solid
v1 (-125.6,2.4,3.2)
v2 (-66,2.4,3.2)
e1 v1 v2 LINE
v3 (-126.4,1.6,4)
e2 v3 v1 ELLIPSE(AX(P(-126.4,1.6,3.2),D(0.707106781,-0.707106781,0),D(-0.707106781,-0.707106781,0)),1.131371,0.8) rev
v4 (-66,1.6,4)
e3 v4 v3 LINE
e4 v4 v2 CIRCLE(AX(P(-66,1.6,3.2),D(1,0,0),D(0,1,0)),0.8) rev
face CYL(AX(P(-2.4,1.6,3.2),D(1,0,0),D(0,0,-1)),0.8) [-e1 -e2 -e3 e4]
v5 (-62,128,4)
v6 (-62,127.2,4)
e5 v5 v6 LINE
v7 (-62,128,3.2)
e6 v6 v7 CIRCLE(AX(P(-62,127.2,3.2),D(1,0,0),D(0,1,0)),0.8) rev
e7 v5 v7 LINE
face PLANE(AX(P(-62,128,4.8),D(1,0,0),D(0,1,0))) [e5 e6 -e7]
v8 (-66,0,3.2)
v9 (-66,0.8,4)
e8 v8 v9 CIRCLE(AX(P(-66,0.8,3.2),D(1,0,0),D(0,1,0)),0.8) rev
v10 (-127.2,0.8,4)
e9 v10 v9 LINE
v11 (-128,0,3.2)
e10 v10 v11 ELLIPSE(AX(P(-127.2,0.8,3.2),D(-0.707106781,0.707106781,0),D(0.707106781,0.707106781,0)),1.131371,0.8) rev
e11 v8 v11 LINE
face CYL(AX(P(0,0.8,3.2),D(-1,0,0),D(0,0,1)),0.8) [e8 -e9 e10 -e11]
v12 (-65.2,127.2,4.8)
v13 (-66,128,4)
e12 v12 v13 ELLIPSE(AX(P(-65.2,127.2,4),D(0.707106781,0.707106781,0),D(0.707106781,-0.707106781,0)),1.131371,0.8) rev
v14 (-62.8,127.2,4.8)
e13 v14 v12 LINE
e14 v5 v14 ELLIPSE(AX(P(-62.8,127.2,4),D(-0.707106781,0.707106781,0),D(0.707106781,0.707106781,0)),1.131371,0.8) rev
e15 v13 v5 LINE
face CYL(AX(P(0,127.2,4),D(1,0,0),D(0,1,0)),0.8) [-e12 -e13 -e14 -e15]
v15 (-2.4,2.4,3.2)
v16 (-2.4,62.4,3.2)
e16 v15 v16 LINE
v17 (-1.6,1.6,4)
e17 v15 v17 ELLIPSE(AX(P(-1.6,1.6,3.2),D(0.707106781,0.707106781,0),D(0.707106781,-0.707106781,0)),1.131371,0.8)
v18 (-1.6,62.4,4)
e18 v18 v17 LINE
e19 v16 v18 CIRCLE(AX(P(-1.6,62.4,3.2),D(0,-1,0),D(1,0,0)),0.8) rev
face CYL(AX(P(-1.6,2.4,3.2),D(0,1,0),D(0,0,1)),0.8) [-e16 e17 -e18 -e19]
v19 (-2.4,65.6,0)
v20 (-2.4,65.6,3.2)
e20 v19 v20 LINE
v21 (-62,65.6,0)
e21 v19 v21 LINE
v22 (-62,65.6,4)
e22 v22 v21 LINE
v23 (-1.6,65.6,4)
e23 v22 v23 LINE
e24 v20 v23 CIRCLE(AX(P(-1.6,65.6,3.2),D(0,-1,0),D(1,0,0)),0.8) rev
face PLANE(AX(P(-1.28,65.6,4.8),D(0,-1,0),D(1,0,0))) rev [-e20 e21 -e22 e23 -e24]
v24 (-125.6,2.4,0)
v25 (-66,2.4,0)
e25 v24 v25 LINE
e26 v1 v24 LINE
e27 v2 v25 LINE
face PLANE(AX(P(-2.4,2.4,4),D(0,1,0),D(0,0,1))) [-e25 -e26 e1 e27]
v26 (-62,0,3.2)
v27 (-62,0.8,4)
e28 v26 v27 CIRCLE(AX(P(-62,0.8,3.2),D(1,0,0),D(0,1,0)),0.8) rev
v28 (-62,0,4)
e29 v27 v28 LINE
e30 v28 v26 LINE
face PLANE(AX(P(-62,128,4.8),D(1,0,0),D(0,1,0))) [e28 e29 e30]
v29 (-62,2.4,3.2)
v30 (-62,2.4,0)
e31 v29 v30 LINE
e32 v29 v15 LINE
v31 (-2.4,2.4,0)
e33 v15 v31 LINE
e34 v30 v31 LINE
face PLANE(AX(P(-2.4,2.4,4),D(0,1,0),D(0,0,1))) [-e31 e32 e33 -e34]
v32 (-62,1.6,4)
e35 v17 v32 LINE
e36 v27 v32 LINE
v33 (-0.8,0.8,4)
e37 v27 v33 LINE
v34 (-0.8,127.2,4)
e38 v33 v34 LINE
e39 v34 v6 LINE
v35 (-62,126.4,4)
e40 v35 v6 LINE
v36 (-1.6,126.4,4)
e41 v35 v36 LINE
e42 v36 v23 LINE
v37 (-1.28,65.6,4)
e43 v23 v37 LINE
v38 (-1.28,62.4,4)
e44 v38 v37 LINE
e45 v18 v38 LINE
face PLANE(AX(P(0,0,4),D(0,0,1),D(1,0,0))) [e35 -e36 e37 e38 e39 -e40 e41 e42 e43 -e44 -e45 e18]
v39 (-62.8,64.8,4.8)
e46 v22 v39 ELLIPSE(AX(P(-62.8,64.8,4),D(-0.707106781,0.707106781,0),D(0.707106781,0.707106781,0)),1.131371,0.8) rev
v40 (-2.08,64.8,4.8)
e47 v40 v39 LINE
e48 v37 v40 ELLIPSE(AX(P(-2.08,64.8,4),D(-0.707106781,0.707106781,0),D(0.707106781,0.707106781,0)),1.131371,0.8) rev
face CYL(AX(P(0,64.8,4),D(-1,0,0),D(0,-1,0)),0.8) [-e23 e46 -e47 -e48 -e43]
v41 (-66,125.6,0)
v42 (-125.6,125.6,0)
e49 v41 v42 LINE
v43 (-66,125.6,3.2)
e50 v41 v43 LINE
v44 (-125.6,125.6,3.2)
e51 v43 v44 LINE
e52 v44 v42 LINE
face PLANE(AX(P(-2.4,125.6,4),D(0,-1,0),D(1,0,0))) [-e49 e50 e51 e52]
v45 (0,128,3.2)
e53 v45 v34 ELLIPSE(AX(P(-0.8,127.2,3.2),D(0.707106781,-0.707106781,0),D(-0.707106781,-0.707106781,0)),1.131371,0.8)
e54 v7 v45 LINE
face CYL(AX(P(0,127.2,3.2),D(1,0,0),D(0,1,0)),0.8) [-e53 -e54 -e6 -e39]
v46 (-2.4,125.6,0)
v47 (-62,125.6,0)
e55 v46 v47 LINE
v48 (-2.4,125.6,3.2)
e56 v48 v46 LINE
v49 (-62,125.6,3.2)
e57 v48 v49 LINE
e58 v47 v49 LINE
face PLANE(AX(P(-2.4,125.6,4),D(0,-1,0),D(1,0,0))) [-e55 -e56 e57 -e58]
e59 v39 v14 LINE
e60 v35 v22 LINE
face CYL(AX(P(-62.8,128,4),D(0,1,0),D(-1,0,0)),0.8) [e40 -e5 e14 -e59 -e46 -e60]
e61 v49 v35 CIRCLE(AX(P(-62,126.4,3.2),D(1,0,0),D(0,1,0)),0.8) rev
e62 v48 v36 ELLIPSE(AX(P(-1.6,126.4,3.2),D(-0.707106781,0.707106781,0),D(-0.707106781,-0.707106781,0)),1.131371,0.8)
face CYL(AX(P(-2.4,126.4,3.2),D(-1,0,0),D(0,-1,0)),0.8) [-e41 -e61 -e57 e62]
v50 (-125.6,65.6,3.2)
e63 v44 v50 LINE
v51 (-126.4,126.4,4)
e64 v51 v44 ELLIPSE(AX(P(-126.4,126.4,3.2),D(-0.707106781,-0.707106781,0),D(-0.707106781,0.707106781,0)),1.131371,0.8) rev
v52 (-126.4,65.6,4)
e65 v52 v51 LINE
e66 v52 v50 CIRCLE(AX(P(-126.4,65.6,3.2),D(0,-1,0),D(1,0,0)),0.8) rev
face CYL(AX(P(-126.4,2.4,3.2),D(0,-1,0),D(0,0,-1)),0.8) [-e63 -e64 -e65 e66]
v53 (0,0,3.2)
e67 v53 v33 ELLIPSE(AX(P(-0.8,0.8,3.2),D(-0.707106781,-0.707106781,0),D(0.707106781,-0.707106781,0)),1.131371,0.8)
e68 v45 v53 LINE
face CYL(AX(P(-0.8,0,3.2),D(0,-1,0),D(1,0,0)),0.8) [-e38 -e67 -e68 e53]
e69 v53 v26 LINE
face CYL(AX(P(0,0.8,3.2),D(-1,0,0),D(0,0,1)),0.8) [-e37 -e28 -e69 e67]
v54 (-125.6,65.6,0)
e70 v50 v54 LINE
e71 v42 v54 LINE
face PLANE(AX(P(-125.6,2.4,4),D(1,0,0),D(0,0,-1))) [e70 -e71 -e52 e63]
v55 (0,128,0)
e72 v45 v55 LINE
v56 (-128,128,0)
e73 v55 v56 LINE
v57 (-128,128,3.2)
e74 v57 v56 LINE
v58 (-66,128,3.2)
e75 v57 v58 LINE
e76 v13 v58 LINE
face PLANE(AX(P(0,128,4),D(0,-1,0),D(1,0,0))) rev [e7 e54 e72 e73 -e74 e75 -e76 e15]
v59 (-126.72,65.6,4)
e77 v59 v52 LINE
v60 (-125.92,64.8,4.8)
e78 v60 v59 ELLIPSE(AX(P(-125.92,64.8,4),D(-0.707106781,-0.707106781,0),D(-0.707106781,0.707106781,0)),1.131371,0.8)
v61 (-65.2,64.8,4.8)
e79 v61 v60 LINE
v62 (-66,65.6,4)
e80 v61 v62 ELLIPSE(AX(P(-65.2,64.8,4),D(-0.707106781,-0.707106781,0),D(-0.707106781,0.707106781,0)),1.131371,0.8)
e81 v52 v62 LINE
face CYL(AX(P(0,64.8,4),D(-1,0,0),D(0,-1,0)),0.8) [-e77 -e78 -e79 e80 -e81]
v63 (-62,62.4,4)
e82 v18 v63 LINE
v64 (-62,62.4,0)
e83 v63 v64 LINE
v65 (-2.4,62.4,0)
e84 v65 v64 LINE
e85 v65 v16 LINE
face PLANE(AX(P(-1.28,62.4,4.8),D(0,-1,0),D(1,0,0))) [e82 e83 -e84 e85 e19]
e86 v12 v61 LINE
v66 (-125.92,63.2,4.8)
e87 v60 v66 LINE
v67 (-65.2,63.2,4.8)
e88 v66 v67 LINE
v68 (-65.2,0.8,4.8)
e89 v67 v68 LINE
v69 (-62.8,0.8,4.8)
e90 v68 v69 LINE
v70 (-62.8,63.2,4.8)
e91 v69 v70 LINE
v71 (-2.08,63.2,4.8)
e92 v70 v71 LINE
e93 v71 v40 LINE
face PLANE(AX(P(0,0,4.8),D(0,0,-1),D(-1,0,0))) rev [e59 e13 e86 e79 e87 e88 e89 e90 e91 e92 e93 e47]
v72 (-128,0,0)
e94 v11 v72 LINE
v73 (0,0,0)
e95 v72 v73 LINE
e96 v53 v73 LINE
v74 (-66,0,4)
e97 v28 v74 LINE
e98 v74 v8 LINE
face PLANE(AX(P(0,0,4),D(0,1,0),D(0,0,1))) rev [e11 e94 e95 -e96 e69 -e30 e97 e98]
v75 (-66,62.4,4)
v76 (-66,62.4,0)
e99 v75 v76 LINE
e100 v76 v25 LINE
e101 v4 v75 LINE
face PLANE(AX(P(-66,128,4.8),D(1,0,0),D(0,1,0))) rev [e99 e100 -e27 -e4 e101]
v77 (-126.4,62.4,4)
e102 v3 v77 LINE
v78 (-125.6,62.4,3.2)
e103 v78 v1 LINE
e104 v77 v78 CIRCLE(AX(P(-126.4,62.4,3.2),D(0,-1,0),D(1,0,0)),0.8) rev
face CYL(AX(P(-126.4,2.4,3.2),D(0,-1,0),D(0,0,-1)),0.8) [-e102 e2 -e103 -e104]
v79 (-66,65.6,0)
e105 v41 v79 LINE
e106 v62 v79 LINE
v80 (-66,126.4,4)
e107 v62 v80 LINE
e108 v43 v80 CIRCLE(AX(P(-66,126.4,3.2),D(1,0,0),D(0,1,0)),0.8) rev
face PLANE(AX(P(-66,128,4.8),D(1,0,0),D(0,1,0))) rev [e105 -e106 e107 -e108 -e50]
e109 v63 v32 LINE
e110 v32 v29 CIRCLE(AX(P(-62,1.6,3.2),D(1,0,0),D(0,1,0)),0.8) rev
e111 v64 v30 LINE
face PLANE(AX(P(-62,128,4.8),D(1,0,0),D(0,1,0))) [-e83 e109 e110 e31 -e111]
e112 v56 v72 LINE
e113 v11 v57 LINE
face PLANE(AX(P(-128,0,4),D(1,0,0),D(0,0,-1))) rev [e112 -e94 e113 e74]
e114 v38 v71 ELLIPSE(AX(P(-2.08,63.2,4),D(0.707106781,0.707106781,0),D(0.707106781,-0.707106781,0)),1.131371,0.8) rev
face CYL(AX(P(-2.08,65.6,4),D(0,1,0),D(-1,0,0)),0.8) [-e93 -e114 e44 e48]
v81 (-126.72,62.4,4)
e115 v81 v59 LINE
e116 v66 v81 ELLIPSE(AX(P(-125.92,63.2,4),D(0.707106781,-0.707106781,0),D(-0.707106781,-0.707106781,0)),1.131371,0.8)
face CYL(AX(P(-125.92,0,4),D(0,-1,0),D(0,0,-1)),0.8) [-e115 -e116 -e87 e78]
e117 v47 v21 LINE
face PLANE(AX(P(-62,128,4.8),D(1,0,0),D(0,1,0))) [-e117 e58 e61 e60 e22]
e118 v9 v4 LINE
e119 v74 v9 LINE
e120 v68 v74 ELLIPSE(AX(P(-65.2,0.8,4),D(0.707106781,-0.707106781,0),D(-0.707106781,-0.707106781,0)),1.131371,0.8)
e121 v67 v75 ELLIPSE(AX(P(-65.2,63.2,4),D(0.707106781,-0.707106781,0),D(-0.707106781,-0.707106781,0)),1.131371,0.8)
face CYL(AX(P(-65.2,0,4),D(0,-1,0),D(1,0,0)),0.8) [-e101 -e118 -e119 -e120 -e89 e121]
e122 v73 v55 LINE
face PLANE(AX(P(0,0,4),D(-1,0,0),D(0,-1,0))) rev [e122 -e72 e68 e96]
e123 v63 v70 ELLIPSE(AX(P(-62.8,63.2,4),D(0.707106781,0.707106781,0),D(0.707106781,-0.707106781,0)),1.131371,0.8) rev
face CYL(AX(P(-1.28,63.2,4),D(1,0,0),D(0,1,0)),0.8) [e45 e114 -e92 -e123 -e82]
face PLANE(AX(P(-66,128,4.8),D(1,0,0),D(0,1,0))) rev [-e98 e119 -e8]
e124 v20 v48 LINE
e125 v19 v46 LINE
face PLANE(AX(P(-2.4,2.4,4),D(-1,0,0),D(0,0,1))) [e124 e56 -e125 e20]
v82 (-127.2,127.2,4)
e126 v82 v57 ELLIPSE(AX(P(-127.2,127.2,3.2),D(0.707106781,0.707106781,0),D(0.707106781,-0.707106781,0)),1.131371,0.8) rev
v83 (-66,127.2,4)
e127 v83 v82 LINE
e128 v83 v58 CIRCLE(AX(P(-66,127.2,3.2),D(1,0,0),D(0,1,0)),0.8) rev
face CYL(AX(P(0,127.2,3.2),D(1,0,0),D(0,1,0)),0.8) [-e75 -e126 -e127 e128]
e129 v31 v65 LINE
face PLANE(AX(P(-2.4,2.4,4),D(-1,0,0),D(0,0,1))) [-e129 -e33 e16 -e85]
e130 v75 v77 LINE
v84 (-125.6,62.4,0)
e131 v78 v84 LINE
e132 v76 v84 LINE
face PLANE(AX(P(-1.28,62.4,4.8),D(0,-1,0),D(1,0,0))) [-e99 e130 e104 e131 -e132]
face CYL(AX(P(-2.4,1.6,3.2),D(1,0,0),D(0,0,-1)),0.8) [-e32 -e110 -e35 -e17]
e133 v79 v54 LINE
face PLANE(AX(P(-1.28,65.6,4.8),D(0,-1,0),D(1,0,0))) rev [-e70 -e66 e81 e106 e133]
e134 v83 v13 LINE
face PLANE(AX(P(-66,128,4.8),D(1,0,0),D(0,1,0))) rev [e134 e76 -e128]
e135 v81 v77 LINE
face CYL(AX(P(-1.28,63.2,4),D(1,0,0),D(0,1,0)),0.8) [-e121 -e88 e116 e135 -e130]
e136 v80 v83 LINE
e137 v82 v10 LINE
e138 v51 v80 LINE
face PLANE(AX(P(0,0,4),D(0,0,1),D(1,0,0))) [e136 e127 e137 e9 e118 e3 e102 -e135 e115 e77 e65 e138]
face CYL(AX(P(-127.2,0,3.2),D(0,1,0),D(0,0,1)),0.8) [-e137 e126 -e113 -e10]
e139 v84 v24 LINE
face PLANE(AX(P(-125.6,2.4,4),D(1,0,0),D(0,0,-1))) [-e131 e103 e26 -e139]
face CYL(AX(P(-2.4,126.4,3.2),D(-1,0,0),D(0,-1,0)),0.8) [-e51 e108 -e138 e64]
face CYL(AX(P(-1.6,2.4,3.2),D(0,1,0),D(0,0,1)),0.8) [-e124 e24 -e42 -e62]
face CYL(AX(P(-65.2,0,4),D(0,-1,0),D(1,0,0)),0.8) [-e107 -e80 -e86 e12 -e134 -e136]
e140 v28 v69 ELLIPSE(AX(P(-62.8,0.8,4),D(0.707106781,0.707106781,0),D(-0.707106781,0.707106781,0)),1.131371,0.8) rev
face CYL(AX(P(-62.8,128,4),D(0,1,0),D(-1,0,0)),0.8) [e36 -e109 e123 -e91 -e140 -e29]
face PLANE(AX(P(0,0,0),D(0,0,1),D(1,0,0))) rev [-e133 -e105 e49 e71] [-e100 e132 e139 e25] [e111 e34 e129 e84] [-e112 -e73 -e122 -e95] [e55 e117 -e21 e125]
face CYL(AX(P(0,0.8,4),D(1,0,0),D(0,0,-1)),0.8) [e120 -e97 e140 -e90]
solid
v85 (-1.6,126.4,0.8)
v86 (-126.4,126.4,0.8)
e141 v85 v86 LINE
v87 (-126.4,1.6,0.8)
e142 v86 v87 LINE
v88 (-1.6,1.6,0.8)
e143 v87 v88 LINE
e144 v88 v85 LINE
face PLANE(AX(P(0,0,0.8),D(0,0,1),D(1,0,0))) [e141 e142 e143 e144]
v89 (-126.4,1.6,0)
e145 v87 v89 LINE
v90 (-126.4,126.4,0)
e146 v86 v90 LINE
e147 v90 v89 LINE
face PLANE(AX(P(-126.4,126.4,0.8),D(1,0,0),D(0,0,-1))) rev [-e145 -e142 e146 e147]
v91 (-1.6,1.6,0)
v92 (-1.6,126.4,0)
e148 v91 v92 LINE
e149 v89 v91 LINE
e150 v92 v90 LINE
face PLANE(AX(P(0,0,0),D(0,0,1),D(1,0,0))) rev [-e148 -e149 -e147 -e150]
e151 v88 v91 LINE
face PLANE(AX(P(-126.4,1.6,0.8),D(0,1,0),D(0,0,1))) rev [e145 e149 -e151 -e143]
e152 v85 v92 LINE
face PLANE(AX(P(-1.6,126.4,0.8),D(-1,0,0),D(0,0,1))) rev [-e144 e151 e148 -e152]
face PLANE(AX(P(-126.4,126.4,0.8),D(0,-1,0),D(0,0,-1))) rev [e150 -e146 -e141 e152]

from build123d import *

# Parameters (mm, degrees)
SKETCH1_W           = 1600
SKETCH1_H           = 1600
SKETCH1_W_2         = 1540
SKETCH1_H_2         = 1540
BOSS_EXTRUDE1_DEPTH = 50
FILLET1_R           = 10
SKETCH2_W           = 50
SKETCH2_H           = 1600
SKETCH2_W_2         = 1568
SKETCH2_H_2         = 40
BOSS_EXTRUDE2_DEPTH = 60
FILLET2_R           = 10
SKETCH4_W           = 1560
SKETCH4_H           = 1560
BOSS_EXTRUDE3_DEPTH = 10
SCALE1_SCALE        = 0.25
SCALE2_SCALE        = 0.32


with BuildPart() as part:
    # Sketch1 → Boss-Extrude1 (new body)
    with BuildSketch(Plane.XY):
        with Locations((-800, 800)):
            Rectangle(SKETCH1_W, SKETCH1_H)
        with Locations((-800, 800)):
            Rectangle(SKETCH1_W_2, SKETCH1_H_2, mode=Mode.SUBTRACT)
    extrude(amount=BOSS_EXTRUDE1_DEPTH)

    # Fillet1
    fillet1_edges = [part.edges().sort_by_distance(p)[0] for p in [
        (-1600, 800, 50),
        (-800, 0, 50),
        (-800, 30, 50),
        (-30, 800, 50),
        (-800, 1570, 50),
        (-1570, 800, 50),
        (0, 800, 50),
        (-800, 1600, 50),
    ]]
    fillet(fillet1_edges, radius=FILLET1_R)

    # Sketch2 → Boss-Extrude2 (add)
    with BuildSketch(Plane.XY):
        with Locations((-800, 800)):
            Rectangle(SKETCH2_W, SKETCH2_H)
        with Locations((-800, 800)):
            Rectangle(SKETCH2_W_2, SKETCH2_H_2)
    extrude(amount=BOSS_EXTRUDE2_DEPTH)

    # Fillet2
    fillet2_edges = [part.edges().sort_by_distance(p)[0] for p in [
        (-800, 0, 60),
        (-825, 390, 60),
        (-1204.5, 780, 60),
        (-1584, 800, 60),
        (-1204.5, 820, 60),
        (-825, 1210, 60),
        (-800, 1600, 60),
        (-775, 1210, 60),
        (-395.5, 820, 60),
        (-16, 800, 60),
        (-395.5, 780, 60),
        (-775, 390, 60),
    ]]
    fillet(fillet2_edges, radius=FILLET2_R - 0.0001)  # a hair under: the kernel refuses the full size


with BuildPart() as body_2:
    # Sketch4 → Boss-Extrude3 (new body)
    with BuildSketch(Plane.XY):
        with Locations((-800, 800)):
            Rectangle(SKETCH4_W, SKETCH4_H)
    extrude(amount=BOSS_EXTRUDE3_DEPTH)


with BuildPart() as body_2_1:
    # Scale1: scaled about (0, 0, 0)
    add(body_2.part.scale(SCALE1_SCALE))


with BuildPart() as part_1:
    # Scale1: scaled about (0, 0, 0)
    add(part.part.scale(SCALE1_SCALE))


with BuildPart() as part_2:
    # Scale2: scaled about (0, 0, 0)
    add(part_1.part.scale(SCALE2_SCALE))


with BuildPart() as body_2_2:
    # Scale2: scaled about (0, 0, 0)
    add(body_2_1.part.scale(SCALE2_SCALE))


solid = Compound([part_2.part, body_2_2.part])
